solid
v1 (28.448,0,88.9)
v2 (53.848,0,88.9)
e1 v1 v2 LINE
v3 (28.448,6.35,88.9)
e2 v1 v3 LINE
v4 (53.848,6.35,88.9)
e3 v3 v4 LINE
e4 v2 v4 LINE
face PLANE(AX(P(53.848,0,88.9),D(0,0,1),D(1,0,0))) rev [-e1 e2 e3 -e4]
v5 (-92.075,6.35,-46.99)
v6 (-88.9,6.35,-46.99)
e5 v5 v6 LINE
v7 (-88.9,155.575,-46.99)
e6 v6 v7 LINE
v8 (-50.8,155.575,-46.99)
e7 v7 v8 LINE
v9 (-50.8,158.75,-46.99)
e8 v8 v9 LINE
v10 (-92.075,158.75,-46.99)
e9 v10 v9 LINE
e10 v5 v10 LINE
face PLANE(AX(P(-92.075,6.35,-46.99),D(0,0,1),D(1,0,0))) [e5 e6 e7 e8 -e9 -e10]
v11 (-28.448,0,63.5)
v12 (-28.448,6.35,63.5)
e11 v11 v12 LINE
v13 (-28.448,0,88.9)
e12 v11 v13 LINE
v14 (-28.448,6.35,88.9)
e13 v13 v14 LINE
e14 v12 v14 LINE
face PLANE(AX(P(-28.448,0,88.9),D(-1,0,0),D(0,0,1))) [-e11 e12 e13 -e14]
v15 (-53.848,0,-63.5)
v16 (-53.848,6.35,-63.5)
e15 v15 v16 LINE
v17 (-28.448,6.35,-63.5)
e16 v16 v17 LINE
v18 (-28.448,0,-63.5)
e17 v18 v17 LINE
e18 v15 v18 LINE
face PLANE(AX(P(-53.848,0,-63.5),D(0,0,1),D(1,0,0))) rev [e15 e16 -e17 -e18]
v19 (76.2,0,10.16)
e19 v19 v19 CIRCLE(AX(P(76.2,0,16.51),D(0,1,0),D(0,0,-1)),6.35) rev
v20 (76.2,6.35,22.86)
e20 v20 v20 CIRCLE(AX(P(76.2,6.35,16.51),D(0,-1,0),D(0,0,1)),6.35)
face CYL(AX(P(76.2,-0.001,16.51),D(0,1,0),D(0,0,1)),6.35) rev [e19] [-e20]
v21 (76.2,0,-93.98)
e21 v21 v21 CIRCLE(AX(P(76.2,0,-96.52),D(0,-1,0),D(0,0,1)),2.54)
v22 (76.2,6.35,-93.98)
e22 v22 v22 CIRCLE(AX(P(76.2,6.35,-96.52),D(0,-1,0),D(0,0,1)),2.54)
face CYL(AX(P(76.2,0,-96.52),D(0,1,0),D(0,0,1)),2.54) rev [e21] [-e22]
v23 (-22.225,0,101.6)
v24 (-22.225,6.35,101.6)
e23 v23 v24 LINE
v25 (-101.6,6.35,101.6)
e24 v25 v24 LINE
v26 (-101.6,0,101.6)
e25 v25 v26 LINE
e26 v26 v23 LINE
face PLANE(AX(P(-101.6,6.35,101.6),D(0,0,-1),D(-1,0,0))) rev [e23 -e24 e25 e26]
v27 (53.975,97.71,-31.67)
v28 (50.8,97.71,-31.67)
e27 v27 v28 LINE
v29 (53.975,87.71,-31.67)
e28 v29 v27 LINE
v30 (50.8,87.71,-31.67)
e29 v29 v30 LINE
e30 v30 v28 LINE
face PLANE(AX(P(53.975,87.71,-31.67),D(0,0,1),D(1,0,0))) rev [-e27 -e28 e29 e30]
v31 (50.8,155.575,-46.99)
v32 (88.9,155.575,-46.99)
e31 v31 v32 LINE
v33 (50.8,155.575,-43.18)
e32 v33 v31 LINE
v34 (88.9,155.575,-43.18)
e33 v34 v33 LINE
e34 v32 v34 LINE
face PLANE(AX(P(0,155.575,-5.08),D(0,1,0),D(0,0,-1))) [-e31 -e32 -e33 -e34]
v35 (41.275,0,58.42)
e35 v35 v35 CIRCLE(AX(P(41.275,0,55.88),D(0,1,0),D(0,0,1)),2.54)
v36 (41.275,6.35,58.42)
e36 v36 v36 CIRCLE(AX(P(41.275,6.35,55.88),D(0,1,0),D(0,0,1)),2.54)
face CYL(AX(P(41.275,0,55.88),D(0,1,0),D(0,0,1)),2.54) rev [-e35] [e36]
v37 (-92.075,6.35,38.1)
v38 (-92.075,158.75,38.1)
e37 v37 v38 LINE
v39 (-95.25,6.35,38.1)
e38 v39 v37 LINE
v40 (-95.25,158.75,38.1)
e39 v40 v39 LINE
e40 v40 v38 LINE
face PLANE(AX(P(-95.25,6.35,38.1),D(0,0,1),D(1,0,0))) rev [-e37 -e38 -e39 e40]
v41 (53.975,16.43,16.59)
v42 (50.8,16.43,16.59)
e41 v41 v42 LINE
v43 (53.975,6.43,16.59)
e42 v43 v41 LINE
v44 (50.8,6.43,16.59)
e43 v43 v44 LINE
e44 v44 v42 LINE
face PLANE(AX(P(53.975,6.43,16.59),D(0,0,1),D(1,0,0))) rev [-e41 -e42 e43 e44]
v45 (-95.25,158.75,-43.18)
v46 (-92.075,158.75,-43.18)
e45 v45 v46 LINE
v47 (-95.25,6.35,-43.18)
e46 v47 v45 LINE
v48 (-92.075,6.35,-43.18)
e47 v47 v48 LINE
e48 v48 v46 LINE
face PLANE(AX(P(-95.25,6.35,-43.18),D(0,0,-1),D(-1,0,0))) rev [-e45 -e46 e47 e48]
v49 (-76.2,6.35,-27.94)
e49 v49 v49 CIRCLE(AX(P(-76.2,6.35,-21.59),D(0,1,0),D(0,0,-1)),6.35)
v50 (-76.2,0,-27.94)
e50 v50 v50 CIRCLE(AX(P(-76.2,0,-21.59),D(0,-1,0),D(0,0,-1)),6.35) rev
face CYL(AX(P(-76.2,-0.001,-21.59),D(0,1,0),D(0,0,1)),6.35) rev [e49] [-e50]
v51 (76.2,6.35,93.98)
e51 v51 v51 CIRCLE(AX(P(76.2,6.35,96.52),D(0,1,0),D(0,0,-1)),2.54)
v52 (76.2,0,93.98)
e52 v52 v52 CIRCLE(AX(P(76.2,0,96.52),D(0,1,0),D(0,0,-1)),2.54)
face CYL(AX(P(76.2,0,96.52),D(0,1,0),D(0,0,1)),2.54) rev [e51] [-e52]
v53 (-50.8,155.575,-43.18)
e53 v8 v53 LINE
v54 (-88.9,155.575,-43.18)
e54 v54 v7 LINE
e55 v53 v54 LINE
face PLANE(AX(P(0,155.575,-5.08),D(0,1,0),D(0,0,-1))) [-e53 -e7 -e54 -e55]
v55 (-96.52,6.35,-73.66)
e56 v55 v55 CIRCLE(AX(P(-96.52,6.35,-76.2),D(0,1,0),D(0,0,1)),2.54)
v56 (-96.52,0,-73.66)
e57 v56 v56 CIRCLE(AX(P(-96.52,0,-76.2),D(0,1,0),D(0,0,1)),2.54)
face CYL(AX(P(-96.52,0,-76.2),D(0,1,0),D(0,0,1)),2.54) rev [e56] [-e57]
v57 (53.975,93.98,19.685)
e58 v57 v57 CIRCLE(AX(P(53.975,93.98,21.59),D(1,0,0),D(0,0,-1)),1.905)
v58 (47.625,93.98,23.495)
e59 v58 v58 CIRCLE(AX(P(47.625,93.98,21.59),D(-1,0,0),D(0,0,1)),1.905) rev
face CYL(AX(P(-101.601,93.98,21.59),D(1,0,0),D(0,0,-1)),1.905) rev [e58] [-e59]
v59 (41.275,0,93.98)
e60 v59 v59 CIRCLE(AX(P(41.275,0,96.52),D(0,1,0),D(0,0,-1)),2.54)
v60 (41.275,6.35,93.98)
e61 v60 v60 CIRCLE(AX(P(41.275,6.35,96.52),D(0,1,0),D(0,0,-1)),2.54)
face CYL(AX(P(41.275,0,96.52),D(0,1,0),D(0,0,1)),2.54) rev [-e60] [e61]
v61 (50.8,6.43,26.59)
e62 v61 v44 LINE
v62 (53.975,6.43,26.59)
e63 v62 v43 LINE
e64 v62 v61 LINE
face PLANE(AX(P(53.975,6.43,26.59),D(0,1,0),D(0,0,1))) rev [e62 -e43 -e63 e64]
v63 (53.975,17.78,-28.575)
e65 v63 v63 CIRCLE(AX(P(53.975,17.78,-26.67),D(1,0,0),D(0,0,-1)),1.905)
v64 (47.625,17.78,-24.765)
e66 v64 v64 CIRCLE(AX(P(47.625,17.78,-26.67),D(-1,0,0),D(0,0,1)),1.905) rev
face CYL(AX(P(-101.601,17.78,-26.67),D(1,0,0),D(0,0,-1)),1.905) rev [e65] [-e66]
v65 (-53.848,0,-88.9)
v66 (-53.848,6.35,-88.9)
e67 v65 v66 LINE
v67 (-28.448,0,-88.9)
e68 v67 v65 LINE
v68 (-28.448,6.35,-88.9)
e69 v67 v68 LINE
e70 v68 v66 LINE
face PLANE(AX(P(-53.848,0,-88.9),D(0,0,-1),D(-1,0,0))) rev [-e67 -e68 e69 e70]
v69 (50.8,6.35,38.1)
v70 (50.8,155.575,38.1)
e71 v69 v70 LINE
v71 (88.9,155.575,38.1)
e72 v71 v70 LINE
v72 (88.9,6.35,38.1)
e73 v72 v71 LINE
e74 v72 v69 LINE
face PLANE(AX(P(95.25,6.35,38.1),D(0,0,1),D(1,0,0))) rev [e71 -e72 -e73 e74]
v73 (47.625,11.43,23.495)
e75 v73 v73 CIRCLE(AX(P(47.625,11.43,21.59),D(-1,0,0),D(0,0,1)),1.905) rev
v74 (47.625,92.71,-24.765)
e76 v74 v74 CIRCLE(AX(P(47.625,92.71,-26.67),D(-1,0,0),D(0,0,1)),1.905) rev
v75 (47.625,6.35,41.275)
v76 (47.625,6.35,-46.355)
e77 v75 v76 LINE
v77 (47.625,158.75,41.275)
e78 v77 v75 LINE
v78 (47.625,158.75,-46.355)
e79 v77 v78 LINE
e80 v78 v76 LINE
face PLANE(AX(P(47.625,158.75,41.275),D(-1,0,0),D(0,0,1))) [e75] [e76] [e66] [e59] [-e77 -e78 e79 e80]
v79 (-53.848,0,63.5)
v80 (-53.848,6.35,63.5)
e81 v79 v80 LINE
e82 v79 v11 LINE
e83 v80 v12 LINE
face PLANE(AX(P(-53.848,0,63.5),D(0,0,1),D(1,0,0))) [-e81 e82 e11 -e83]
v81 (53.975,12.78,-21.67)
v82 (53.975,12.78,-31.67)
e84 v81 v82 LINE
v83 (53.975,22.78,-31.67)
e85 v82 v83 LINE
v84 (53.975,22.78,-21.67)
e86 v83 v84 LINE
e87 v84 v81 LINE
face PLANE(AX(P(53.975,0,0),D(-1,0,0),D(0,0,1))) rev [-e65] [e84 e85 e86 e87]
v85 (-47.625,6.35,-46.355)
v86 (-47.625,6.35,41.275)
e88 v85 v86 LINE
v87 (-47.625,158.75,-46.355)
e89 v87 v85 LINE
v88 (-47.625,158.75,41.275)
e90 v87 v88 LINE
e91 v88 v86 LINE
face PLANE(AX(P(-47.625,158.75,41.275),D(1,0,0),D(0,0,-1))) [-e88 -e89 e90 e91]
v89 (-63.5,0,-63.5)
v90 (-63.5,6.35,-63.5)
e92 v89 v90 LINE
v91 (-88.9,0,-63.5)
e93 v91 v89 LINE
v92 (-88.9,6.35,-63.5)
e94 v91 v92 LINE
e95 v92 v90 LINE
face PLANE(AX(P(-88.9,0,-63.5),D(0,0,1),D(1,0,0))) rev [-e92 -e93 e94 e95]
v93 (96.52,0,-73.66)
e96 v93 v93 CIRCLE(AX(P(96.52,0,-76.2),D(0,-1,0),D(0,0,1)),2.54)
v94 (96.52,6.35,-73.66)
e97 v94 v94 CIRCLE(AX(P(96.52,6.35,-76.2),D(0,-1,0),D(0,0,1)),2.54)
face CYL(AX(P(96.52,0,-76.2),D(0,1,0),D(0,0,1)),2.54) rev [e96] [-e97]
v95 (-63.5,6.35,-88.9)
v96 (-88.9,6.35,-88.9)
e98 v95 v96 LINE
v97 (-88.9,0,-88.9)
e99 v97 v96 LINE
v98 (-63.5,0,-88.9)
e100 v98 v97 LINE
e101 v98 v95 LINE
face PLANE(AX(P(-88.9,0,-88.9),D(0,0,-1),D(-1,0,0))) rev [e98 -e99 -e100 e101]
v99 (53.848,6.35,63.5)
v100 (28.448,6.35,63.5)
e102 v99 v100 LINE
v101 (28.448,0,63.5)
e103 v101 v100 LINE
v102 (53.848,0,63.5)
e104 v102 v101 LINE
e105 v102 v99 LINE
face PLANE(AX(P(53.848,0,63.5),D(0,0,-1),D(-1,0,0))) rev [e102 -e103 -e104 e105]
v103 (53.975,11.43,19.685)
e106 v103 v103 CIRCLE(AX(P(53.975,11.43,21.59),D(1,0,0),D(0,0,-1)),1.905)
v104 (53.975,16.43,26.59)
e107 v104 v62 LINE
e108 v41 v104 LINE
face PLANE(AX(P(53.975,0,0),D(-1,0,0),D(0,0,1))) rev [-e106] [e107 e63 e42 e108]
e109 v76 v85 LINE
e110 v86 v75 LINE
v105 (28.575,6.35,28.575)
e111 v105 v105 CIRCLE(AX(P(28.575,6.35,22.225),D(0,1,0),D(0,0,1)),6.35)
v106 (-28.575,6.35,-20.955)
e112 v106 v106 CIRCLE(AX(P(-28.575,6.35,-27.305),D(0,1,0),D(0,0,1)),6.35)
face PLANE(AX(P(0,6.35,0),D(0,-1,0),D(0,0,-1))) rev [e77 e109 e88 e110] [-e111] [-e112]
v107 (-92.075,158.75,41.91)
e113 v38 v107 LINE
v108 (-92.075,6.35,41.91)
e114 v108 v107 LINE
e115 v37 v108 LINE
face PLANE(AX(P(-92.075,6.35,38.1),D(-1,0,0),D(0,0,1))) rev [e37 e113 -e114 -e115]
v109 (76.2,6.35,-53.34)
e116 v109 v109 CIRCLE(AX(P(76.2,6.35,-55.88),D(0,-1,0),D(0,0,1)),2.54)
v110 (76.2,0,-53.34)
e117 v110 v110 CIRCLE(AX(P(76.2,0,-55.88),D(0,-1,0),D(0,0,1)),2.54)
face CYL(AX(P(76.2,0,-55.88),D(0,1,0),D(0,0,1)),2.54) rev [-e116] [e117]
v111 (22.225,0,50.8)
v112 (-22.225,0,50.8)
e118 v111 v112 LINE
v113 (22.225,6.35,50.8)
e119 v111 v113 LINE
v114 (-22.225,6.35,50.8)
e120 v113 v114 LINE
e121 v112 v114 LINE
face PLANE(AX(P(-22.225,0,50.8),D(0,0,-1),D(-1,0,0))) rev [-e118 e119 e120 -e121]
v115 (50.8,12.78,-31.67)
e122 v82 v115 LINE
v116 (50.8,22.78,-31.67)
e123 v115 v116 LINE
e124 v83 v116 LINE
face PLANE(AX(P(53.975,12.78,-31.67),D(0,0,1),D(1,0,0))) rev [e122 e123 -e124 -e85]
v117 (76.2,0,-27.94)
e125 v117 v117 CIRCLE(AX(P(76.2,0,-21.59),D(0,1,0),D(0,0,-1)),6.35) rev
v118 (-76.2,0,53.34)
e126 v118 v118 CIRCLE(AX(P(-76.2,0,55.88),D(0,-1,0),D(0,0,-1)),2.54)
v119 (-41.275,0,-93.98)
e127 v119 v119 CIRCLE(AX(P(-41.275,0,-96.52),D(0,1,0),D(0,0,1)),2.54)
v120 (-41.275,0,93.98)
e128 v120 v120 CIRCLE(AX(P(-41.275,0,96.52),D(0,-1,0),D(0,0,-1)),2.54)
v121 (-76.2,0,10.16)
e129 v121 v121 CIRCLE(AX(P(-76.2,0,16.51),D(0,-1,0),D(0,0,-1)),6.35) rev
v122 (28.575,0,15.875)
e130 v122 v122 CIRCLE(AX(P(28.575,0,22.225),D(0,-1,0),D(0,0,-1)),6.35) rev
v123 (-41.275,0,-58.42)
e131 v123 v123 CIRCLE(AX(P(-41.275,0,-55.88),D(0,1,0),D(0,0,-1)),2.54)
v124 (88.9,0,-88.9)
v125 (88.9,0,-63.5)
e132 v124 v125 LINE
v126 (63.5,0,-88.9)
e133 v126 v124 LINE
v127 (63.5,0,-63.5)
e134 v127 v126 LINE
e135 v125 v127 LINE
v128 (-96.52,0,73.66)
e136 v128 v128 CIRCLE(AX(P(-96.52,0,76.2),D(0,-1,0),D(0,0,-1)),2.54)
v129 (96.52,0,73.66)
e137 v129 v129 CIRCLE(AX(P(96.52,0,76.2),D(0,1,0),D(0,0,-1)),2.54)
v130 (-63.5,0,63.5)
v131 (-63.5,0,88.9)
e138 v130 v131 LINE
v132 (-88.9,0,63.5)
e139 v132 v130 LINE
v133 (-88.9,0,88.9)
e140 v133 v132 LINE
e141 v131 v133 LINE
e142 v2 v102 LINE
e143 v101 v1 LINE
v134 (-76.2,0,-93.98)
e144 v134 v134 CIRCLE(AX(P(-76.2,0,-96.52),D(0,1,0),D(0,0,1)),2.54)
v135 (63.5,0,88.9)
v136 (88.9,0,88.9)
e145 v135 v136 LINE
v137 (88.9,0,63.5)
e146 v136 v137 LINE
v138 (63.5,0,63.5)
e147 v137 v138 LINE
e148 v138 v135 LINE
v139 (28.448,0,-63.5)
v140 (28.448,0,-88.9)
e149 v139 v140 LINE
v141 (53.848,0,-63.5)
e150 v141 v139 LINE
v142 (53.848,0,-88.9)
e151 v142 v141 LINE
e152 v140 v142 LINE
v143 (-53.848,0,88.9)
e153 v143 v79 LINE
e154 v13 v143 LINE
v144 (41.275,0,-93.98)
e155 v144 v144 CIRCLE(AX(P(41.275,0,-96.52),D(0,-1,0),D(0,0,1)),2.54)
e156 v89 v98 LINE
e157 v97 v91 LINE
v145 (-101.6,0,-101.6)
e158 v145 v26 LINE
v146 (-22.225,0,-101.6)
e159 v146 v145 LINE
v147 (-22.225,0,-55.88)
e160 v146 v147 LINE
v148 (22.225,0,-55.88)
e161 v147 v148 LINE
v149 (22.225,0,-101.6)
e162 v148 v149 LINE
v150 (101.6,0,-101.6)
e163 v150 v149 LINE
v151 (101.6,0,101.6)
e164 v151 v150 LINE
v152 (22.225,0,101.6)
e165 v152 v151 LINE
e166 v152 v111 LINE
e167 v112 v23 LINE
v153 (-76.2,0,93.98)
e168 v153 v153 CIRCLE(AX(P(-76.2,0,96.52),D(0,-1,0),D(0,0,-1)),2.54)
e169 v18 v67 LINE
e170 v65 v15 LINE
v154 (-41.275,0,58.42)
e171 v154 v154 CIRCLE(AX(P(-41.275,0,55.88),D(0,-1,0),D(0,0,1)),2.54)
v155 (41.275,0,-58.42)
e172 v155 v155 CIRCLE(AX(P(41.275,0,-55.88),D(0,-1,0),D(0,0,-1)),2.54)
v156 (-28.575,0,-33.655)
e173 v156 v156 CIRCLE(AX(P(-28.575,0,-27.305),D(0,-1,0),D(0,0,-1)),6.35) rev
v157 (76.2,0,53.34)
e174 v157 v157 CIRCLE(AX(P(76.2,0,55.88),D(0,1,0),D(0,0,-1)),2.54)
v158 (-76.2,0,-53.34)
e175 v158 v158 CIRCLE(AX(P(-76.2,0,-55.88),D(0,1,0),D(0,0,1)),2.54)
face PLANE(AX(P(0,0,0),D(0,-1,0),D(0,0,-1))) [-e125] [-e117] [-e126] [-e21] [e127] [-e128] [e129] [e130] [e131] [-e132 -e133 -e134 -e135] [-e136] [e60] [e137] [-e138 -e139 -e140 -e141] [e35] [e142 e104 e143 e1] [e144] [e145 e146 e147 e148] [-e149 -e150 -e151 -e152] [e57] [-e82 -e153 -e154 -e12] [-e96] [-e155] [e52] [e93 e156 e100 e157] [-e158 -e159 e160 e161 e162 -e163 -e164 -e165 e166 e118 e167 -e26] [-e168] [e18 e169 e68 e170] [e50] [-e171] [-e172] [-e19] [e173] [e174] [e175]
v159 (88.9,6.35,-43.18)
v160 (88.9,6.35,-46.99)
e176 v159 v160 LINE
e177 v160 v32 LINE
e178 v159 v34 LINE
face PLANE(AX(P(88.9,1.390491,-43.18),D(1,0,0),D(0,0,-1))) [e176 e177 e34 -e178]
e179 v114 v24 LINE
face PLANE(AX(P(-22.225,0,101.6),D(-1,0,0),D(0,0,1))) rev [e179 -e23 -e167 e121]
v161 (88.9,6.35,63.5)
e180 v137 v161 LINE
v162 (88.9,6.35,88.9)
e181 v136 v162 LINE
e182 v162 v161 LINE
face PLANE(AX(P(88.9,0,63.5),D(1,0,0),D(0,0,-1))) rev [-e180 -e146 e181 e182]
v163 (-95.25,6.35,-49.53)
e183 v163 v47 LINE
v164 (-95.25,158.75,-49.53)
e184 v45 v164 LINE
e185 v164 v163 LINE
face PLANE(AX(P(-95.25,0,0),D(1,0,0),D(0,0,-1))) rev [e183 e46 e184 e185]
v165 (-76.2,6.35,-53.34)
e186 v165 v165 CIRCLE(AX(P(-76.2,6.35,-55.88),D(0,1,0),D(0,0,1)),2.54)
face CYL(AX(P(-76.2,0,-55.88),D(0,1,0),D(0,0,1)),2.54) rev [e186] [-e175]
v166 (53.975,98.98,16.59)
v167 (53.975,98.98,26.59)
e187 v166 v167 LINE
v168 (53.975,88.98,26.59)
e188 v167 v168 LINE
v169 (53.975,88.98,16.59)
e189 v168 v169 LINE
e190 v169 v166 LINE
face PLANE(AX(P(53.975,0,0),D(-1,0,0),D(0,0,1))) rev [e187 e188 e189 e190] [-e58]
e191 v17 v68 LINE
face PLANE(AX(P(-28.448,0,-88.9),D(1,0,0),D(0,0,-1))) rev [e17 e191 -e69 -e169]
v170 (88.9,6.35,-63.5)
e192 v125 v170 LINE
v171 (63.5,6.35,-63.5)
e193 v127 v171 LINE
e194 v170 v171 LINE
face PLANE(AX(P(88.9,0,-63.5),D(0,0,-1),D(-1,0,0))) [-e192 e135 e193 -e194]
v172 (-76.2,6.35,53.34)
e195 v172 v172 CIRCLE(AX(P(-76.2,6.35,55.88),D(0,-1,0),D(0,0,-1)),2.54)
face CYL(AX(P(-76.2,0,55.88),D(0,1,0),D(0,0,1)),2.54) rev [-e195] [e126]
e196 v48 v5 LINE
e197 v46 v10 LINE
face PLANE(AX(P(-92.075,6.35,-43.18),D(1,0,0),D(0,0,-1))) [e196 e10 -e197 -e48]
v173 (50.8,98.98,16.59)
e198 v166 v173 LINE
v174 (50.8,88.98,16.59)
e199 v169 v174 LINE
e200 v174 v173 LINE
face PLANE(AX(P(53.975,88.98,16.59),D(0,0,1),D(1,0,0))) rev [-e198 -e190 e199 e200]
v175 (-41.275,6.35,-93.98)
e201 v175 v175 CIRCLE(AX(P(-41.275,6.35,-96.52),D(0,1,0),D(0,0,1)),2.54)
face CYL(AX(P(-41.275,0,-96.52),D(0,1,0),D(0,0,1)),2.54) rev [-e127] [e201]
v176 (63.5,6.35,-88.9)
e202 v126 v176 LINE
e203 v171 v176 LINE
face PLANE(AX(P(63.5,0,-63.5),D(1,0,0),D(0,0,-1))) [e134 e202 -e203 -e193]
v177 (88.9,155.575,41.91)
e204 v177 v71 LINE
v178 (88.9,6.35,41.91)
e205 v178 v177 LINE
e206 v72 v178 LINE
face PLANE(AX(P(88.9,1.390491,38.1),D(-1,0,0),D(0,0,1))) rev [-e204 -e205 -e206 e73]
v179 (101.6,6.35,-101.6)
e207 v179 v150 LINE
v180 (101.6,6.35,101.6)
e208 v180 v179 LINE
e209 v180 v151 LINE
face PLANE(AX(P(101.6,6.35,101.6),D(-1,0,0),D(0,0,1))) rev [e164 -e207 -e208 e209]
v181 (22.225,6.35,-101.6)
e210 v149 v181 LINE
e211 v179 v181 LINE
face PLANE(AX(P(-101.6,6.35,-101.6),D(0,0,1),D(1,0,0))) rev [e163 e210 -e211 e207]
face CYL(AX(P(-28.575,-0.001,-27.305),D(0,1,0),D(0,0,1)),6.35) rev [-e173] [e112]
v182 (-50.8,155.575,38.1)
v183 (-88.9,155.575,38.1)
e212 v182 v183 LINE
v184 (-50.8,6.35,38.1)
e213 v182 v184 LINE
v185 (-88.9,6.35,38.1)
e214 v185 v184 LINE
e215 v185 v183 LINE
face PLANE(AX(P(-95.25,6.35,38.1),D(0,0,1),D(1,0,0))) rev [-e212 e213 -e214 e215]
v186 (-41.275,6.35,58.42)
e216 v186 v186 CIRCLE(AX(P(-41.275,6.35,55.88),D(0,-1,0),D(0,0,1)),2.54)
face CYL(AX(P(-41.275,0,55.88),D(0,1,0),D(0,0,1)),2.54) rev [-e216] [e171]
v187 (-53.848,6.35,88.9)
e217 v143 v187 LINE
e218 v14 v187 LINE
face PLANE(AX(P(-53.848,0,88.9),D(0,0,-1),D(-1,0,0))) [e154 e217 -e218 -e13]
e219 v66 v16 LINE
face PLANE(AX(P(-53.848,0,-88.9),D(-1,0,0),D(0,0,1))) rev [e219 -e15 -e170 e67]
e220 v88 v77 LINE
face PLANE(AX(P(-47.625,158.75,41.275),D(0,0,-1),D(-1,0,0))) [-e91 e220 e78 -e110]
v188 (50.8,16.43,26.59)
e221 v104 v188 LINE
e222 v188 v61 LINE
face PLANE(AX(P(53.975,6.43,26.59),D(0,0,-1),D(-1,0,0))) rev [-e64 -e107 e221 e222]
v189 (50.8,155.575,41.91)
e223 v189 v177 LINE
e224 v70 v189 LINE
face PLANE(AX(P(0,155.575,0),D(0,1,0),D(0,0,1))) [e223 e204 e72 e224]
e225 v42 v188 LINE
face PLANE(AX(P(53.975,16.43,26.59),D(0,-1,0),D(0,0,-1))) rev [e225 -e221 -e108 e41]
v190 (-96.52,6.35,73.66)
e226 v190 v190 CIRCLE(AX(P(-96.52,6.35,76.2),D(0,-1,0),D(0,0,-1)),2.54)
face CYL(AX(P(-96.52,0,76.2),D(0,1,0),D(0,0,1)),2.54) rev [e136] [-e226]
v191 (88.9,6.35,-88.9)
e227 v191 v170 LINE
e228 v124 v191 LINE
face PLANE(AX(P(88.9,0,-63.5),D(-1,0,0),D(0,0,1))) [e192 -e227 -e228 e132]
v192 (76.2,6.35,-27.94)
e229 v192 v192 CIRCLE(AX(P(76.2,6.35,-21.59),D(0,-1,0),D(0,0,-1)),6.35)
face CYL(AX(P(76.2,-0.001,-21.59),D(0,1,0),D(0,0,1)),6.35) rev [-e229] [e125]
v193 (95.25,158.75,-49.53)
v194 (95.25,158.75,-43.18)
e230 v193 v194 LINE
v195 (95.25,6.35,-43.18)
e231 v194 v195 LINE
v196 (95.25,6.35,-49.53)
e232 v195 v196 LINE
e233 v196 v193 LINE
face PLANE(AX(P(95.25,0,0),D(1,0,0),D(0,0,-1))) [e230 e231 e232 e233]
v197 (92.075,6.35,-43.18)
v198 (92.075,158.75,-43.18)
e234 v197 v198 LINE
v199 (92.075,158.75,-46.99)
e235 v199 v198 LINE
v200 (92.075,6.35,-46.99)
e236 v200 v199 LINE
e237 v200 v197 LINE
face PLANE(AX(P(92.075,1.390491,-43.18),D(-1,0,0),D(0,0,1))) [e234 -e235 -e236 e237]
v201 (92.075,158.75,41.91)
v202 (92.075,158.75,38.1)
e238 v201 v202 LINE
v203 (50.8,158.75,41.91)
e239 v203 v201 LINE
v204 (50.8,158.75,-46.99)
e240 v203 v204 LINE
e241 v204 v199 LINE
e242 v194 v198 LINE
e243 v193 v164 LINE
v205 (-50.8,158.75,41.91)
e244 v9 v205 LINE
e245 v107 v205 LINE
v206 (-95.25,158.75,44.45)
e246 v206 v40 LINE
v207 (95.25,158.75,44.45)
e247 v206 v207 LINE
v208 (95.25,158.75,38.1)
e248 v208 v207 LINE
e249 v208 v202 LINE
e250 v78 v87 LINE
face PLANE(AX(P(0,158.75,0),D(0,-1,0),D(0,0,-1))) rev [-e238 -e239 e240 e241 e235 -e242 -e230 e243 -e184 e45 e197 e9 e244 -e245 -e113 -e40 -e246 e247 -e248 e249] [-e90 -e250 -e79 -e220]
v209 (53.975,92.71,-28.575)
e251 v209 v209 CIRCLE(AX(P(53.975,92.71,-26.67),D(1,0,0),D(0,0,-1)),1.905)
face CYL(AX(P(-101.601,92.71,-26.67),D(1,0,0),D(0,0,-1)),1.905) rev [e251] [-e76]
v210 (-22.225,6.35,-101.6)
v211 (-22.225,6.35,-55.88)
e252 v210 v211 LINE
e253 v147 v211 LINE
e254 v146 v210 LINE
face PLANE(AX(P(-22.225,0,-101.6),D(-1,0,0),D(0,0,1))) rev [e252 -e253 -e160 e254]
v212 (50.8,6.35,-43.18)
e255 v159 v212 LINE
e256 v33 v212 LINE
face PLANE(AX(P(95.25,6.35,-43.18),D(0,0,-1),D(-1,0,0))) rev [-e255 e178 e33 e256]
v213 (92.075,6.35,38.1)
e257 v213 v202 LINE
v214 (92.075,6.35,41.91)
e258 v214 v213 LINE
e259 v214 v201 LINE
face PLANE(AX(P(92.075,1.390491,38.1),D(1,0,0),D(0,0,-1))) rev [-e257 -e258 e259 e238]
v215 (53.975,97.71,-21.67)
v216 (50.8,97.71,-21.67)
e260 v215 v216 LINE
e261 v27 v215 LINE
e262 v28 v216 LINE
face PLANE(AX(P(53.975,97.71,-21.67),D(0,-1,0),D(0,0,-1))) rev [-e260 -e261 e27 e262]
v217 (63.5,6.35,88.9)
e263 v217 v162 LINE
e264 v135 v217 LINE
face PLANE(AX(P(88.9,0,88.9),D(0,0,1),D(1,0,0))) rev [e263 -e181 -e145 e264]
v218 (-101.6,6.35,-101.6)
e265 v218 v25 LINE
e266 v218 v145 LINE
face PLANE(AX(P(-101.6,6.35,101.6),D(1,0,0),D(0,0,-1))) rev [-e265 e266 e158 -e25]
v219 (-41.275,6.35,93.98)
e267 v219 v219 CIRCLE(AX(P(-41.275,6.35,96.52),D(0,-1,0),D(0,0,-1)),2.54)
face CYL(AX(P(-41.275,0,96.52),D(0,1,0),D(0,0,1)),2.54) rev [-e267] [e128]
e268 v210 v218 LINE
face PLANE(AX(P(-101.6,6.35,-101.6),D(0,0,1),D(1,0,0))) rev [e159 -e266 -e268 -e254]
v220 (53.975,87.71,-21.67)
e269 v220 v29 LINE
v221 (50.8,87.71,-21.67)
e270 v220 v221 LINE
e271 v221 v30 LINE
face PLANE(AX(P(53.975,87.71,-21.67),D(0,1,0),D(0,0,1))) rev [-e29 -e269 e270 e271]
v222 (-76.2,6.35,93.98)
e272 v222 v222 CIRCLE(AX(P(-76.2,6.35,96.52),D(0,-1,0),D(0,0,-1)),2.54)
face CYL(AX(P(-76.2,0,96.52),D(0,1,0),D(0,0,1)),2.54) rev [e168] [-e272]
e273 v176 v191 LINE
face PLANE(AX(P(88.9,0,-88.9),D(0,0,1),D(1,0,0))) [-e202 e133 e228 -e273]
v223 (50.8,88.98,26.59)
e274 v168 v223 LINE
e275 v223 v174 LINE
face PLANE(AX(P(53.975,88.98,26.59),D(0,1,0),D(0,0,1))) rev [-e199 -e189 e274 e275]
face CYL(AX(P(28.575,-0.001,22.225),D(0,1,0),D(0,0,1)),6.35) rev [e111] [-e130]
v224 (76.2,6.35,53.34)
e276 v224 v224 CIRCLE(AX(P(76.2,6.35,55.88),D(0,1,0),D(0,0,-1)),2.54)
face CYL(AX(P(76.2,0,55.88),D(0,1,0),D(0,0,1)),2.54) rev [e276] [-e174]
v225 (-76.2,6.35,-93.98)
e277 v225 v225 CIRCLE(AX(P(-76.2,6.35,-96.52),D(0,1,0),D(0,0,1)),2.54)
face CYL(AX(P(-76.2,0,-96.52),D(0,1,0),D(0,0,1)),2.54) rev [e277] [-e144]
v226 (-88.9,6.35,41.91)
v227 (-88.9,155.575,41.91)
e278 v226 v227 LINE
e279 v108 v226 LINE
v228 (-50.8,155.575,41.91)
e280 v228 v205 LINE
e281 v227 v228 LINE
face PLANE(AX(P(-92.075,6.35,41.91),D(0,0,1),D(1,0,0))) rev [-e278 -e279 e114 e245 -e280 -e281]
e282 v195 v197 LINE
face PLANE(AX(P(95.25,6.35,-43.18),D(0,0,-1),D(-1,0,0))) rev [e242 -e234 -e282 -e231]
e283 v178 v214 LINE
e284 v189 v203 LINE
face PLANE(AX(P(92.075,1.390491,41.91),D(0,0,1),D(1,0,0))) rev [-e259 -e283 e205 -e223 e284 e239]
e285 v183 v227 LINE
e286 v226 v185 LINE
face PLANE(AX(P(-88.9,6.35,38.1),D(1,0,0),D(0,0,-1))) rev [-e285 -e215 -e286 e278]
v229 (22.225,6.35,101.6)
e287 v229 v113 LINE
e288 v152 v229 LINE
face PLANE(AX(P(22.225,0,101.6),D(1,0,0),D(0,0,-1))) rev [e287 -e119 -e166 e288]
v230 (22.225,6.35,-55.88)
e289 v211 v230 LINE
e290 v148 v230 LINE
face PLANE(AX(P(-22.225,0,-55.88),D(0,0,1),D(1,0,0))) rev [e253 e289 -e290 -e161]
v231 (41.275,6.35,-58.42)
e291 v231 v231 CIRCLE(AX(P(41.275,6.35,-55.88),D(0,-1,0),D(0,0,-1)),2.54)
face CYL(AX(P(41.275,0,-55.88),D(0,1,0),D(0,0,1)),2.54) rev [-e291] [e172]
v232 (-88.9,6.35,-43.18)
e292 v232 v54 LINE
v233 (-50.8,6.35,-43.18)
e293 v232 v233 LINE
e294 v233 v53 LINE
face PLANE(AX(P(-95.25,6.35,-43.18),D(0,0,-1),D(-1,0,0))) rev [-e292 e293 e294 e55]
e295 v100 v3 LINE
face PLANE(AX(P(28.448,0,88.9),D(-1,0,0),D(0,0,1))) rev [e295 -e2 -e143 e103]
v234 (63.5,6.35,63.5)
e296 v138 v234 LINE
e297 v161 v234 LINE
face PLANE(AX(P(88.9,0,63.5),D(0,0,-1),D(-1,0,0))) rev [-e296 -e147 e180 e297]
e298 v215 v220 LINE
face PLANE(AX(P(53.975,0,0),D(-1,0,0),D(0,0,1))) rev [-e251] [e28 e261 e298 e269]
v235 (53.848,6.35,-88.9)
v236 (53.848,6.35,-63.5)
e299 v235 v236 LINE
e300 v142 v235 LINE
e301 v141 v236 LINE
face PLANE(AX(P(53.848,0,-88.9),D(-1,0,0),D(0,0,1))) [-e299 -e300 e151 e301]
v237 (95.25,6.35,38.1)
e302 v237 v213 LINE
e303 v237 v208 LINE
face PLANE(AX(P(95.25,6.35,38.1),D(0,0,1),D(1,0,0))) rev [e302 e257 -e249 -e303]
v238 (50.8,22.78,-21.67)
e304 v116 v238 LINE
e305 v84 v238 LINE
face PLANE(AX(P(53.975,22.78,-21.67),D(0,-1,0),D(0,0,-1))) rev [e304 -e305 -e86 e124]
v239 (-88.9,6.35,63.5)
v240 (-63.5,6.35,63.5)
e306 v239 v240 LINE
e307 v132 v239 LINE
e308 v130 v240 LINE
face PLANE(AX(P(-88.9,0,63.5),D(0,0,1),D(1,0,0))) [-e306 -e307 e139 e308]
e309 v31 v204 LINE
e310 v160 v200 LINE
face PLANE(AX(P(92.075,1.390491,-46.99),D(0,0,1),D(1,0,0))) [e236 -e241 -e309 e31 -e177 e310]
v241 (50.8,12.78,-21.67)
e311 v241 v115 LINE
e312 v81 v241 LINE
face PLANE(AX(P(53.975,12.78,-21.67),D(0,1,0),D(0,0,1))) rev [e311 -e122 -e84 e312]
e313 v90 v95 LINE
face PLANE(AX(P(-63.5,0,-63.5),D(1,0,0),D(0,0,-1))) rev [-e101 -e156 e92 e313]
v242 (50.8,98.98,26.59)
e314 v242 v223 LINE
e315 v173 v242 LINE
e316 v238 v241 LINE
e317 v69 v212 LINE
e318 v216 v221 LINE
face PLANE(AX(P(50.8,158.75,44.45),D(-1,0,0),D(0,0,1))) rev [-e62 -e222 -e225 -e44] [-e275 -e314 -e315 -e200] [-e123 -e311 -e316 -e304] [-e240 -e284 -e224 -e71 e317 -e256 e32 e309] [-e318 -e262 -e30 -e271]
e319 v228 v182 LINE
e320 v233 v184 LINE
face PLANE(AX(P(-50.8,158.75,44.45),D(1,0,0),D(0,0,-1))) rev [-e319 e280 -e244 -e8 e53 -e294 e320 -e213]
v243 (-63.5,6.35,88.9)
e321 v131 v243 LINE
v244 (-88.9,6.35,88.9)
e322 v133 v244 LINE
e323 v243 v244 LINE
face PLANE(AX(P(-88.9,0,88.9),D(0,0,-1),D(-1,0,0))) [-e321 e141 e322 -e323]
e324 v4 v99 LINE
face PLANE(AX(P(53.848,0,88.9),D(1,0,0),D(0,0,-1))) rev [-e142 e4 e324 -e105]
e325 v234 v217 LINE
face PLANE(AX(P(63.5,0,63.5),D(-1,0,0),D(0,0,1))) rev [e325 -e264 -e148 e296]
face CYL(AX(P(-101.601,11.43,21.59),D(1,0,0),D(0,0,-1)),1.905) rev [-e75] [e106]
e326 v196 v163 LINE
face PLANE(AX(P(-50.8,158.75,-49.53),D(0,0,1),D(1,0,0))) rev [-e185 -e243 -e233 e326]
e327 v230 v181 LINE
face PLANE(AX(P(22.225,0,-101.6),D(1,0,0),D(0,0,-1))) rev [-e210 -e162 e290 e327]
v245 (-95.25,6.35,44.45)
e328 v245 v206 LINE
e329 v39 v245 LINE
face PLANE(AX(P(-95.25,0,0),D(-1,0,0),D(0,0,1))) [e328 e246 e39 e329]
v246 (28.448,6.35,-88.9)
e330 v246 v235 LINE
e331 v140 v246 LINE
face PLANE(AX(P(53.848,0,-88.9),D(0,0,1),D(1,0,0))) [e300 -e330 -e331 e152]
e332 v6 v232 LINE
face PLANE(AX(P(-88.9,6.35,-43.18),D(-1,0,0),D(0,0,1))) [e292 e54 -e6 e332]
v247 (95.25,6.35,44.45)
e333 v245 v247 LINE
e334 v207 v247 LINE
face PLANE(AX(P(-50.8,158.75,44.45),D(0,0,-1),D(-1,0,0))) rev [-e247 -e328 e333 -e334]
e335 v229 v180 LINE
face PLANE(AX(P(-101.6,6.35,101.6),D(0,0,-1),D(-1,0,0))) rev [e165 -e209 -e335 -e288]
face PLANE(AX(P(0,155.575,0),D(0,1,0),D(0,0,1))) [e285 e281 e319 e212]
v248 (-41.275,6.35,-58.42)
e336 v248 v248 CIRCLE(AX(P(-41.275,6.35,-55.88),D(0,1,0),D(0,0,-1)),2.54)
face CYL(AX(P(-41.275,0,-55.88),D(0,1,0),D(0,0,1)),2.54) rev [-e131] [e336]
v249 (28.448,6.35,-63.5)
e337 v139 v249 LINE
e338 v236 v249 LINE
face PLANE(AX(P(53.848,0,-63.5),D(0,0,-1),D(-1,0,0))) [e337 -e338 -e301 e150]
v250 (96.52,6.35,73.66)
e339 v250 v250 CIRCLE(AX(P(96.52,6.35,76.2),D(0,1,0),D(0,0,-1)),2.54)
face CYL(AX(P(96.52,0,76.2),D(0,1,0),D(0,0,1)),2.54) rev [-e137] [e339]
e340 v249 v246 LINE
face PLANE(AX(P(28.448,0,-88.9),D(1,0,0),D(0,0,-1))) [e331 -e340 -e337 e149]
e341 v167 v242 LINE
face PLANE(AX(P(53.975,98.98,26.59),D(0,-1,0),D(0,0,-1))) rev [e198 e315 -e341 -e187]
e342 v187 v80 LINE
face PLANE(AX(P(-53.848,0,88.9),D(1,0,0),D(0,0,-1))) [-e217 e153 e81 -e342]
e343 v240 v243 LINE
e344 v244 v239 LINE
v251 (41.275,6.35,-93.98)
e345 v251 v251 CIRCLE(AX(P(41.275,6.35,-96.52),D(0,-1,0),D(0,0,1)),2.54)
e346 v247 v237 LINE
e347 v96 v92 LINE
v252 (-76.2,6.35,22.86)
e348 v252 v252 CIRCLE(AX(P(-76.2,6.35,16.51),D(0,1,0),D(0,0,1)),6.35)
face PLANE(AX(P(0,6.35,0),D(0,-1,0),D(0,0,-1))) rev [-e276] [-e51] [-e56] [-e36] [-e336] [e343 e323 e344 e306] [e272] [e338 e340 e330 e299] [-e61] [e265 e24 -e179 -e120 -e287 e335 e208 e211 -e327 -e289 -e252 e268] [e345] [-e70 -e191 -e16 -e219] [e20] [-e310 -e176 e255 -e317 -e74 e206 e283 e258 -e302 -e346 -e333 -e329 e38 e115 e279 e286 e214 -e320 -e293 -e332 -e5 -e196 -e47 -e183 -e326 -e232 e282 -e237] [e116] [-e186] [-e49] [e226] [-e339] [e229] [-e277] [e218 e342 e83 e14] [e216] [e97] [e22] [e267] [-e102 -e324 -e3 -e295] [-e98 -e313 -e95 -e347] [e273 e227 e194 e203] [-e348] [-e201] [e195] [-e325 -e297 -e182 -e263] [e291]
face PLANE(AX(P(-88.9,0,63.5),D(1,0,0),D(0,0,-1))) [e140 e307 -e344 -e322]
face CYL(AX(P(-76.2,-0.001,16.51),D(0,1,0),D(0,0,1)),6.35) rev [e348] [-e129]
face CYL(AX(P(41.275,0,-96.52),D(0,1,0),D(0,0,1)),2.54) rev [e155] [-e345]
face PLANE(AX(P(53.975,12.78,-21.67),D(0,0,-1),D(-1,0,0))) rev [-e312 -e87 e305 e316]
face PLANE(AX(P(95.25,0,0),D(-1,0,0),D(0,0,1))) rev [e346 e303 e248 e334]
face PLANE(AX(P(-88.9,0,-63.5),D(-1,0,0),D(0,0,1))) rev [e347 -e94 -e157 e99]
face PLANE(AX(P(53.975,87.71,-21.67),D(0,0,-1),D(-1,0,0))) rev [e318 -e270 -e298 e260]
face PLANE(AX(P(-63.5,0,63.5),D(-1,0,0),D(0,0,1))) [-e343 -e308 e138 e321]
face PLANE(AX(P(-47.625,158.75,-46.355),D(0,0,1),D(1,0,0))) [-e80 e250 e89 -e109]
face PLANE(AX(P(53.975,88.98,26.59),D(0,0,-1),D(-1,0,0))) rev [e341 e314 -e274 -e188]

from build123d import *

# Parameters (mm, degrees)
SKETCH1_W               = 203.2
SKETCH1_H               = 203.2
BOSS_EXTRUDE1_DEPTH     = 6.35
SKETCH2_W               = 44.45
SKETCH2_H               = 45.72
SKETCH2_H_2             = 50.8
CUT_EXTRUDE1_DEPTH      = 144.824345992
SKETCH3_R               = 2.54
SKETCH3_W               = 25.4
SKETCH3_H               = 25.4
CUT_EXTRUDE2_DEPTH      = 6.35
MIRROR2_COPY_1_SKETCH_R = 2.54
MIRROR2_COPY_1_SKETCH_W = 25.4
MIRROR2_COPY_1_SKETCH_H = 25.4
MIRROR2_COPY_1_DEPTH    = 6.35
SKETCH4_W               = 101.6
SKETCH4_H               = 93.98
SKETCH4_W_2             = 95.25
SKETCH4_H_2             = 87.63
BOSS_EXTRUDE2_DEPTH     = 152.4
SKETCH5_W               = 10
SKETCH5_H               = 10
SKETCH5_R               = 1.6
BOSS_EXTRUDE3_DEPTH     = 3.175
CUT_EXTRUDE3_REACH      = 246.393
SKETCH8_R               = 1.905
SKETCH9_W               = 6.35
SKETCH9_H               = 152.4
BOSS_EXTRUDE4_DEPTH     = 44.45
SKETCH12_W              = 3.175
SKETCH12_H              = 3.81
CUT_EXTRUDE4_DEPTH      = 152.4
SKETCH13_W              = 38.1
SKETCH13_H              = 3.81
CUT_EXTRUDE5_DEPTH      = 3.175
SKETCH14_W              = 6.35
SKETCH14_H              = 152.4
BOSS_EXTRUDE5_DEPTH     = 44.45
SKETCH15_W              = 3.175
SKETCH15_H              = 3.81
CUT_EXTRUDE6_DEPTH      = 152.4
SKETCH16_W              = 38.1
SKETCH16_H              = 3.81
CUT_EXTRUDE7_DEPTH      = 3.175
CUT_EXTRUDE8_REACH      = 211.454
SKETCH17_R              = 6.35
MIRROR5_OUTLINE_R       = 6.35
MIRROR5_DEPTH           = 6.35


# Read off the part's stored shape, not the designer's step: Mirror5
with BuildPart() as part:
    # Sketch1 → Boss-Extrude1 (new body)
    with BuildSketch(Plane(origin=(0, 0, 0), x_dir=(1, 0, 0), z_dir=(0, 1, 0))):
        Rectangle(SKETCH1_W, SKETCH1_H)
    extrude(amount=BOSS_EXTRUDE1_DEPTH)

    # Sketch2 → Cut-Extrude1 (cut, through all)
    with BuildSketch(Plane(origin=(0, 6.35, 0), x_dir=(1, 0, 0), z_dir=(0, 1, 0))):
        with Locations((0, 78.74)):
            Rectangle(SKETCH2_W, SKETCH2_H)
        with Locations((0, -76.2)):
            Rectangle(SKETCH2_W, SKETCH2_H_2)
    extrude(amount=-CUT_EXTRUDE1_DEPTH, mode=Mode.SUBTRACT)

    # Sketch3 → Cut-Extrude2 (cut)
    with BuildSketch(Plane(origin=(0, 6.35, 0), x_dir=(1, 0, 0), z_dir=(0, 1, 0))):
        with Locations(Location((-96.52, 76.2, 0), (0, 0, 270))):
            Circle(SKETCH3_R)
        with Locations(Location((-76.2, 96.52, 0), (0, 0, 270))):
            Circle(SKETCH3_R)
        with Locations(Location((-76.2, 55.88, 0), (0, 0, 270))):
            Circle(SKETCH3_R)
        with Locations(Location((-41.275, 96.52, 0), (0, 0, 270))):
            Circle(SKETCH3_R)
        with Locations(Location((-41.275, 55.88, 0), (0, 0, 90))):
            Circle(SKETCH3_R)
        with Locations((-41.148, 76.2)):
            Rectangle(SKETCH3_W, SKETCH3_H)
        with Locations((-76.2, 76.2)):
            Rectangle(SKETCH3_W, SKETCH3_H)
    cut_extrude2 = extrude(amount=-CUT_EXTRUDE2_DEPTH, mode=Mode.SUBTRACT)

    # Mirror1: Cut-Extrude2 across plane
    add(cut_extrude2.mirror(Plane(origin=(0, 0, 0), x_dir=(0, 0, 1), z_dir=(1, 0, 0))), mode=Mode.SUBTRACT)

    # Mirror2: Cut-Extrude2 across plane
    add(cut_extrude2.mirror(Plane.XY), mode=Mode.SUBTRACT)

    # Mirror2 copy 1 sketch → Mirror2 copy 1 (cut)
    with BuildSketch(Plane(origin=(0, 6.35, 0), x_dir=(-1, 0, 0), z_dir=(0, 1, 0))):
        with Locations(Location((-96.52, 76.2, 0), (0, 0, 270))):
            Circle(MIRROR2_COPY_1_SKETCH_R)
        with Locations(Location((-76.2, 96.52, 0), (0, 0, 270))):
            Circle(MIRROR2_COPY_1_SKETCH_R)
        with Locations(Location((-76.2, 55.88, 0), (0, 0, 270))):
            Circle(MIRROR2_COPY_1_SKETCH_R)
        with Locations(Location((-41.275, 96.52, 0), (0, 0, 270))):
            Circle(MIRROR2_COPY_1_SKETCH_R)
        with Locations(Location((-41.275, 55.88, 0), (0, 0, 90))):
            Circle(MIRROR2_COPY_1_SKETCH_R)
        with Locations((-41.148, 76.2)):
            Rectangle(MIRROR2_COPY_1_SKETCH_W, MIRROR2_COPY_1_SKETCH_H)
        with Locations((-76.2, 76.2)):
            Rectangle(MIRROR2_COPY_1_SKETCH_W, MIRROR2_COPY_1_SKETCH_H)
    extrude(amount=-MIRROR2_COPY_1_DEPTH, mode=Mode.SUBTRACT)

    # Sketch4 → Boss-Extrude2 (add)
    with BuildSketch(Plane(origin=(0, 6.35, 0), x_dir=(1, 0, 0), z_dir=(0, 1, 0))):
        with Locations((0, 2.54)):
            Rectangle(SKETCH4_W, SKETCH4_H)
        with Locations((0, 2.54)):
            Rectangle(SKETCH4_W_2, SKETCH4_H_2, mode=Mode.SUBTRACT)
    extrude(amount=BOSS_EXTRUDE2_DEPTH)

    # Sketch5 → Boss-Extrude3 (add)
    # profile 1 of 4: a face of its own
    with BuildSketch(Plane(origin=(50.8, 0, 0), x_dir=(0, 0, -1), z_dir=(1, 0, 0))):
        with Locations((-21.59, 93.98)):
            Rectangle(SKETCH5_W, SKETCH5_H)
        with Locations((-21.59, 93.98)):
            Circle(SKETCH5_R, mode=Mode.SUBTRACT)
    # profile 2 of 4: a face of its own
    with BuildSketch(Plane(origin=(50.8, 0, 0), x_dir=(0, 0, -1), z_dir=(1, 0, 0))):
        with Locations((26.67, 92.71)):
            Rectangle(SKETCH5_W, SKETCH5_H)
        with Locations((26.67, 92.71)):
            Circle(SKETCH5_R, mode=Mode.SUBTRACT)
    # profile 3 of 4: a face of its own
    with BuildSketch(Plane(origin=(50.8, 0, 0), x_dir=(0, 0, -1), z_dir=(1, 0, 0))):
        with Locations((-21.59, 11.43)):
            Rectangle(SKETCH5_W, SKETCH5_H)
        with Locations((-21.59, 11.43)):
            Circle(SKETCH5_R, mode=Mode.SUBTRACT)
    # profile 4 of 4: a face of its own
    with BuildSketch(Plane(origin=(50.8, 0, 0), x_dir=(0, 0, -1), z_dir=(1, 0, 0))):
        with Locations((26.67, 17.78)):
            Rectangle(SKETCH5_W, SKETCH5_H)
        with Locations((26.67, 17.78)):
            Circle(SKETCH5_R, mode=Mode.SUBTRACT)
    extrude(amount=BOSS_EXTRUDE3_DEPTH)

    # Sketch8 → Cut-Extrude3 (cut, up to next)
    with BuildSketch(Plane(origin=(53.975, 0, 0), x_dir=(0, 0, -1), z_dir=(1, 0, 0)), mode=Mode.PRIVATE) as cut_extrude3_sk1:
        with Locations((-21.59, 93.98)):
            Circle(SKETCH8_R)
    cut_extrude3_tool1 = extrude(cut_extrude3_sk1.sketch, amount=-CUT_EXTRUDE3_REACH, mode=Mode.PRIVATE) & part.part
    # Sketch8 → Cut-Extrude3 (cut, up to next)
    with BuildSketch(Plane(origin=(53.975, 0, 0), x_dir=(0, 0, -1), z_dir=(1, 0, 0)), mode=Mode.PRIVATE) as cut_extrude3_sk2:
        with Locations((26.67, 92.71)):
            Circle(SKETCH8_R)
    cut_extrude3_tool2 = extrude(cut_extrude3_sk2.sketch, amount=-CUT_EXTRUDE3_REACH, mode=Mode.PRIVATE) & part.part
    # Sketch8 → Cut-Extrude3 (cut, up to next)
    with BuildSketch(Plane(origin=(53.975, 0, 0), x_dir=(0, 0, -1), z_dir=(1, 0, 0)), mode=Mode.PRIVATE) as cut_extrude3_sk3:
        with Locations((-21.59, 11.43)):
            Circle(SKETCH8_R)
    cut_extrude3_tool3 = extrude(cut_extrude3_sk3.sketch, amount=-CUT_EXTRUDE3_REACH, mode=Mode.PRIVATE) & part.part
    # Sketch8 → Cut-Extrude3 (cut, up to next)
    with BuildSketch(Plane(origin=(53.975, 0, 0), x_dir=(0, 0, -1), z_dir=(1, 0, 0)), mode=Mode.PRIVATE) as cut_extrude3_sk4:
        with Locations((26.67, 17.78)):
            Circle(SKETCH8_R)
    cut_extrude3_tool4 = extrude(cut_extrude3_sk4.sketch, amount=-CUT_EXTRUDE3_REACH, mode=Mode.PRIVATE) & part.part
    add(cut_extrude3_tool1.solids().sort_by_distance((53.975, 93.98, 21.59))[0], mode=Mode.SUBTRACT)
    add(cut_extrude3_tool2.solids().sort_by_distance((53.975, 92.71, -26.67))[0], mode=Mode.SUBTRACT)
    add(cut_extrude3_tool3.solids().sort_by_distance((53.975, 11.43, 21.59))[0], mode=Mode.SUBTRACT)
    add(cut_extrude3_tool4.solids().sort_by_distance((53.975, 17.78, -26.67))[0], mode=Mode.SUBTRACT)

    # Sketch9 → Boss-Extrude4 (add)
    with BuildSketch(Plane(origin=(50.8, 0, 0), x_dir=(0, 0, -1), z_dir=(1, 0, 0))):
        with Locations((-41.275, 82.55)):
            Rectangle(SKETCH9_W, SKETCH9_H)
        with Locations((46.355, 82.55)):
            Rectangle(SKETCH9_W, SKETCH9_H)
    extrude(amount=BOSS_EXTRUDE4_DEPTH)

    # Sketch12 → Cut-Extrude4 (cut)
    with BuildSketch(Plane(origin=(0, 158.75, 0), x_dir=(1, 0, 0), z_dir=(0, 1, 0))):
        with Locations((90.4875, -40.005)):
            Rectangle(SKETCH12_W, SKETCH12_H)
    cut_extrude4 = extrude(amount=-CUT_EXTRUDE4_DEPTH, mode=Mode.SUBTRACT)

    # Sketch13 → Cut-Extrude5 (cut)
    with BuildSketch(Plane(origin=(0, 158.75, 0), x_dir=(1, 0, 0), z_dir=(0, 1, 0))):
        with Locations((69.85, -40.005)):
            Rectangle(SKETCH13_W, SKETCH13_H)
    cut_extrude5 = extrude(amount=-CUT_EXTRUDE5_DEPTH, mode=Mode.SUBTRACT)

    # Mirror3: Cut-Extrude4, Cut-Extrude5 across plane
    add(cut_extrude4.mirror(Plane(origin=(0, 0, -2.54), x_dir=(1, 0, 0), z_dir=(0, 0, -1))), mode=Mode.SUBTRACT)
    add(cut_extrude5.mirror(Plane(origin=(0, 0, -2.54), x_dir=(1, 0, 0), z_dir=(0, 0, -1))), mode=Mode.SUBTRACT)

    # Sketch14 → Boss-Extrude5 (add)
    with BuildSketch(Plane.ZY.offset(50.8)):
        with Locations((-46.355, 82.55)):
            Rectangle(SKETCH14_W, SKETCH14_H)
        with Locations((41.275, 82.55)):
            Rectangle(SKETCH14_W, SKETCH14_H)
    extrude(amount=BOSS_EXTRUDE5_DEPTH)

    # Sketch15 → Cut-Extrude6 (cut)
    with BuildSketch(Plane(origin=(0, 158.75, 0), x_dir=(1, 0, 0), z_dir=(0, 1, 0))):
        with Locations((-90.4875, -40.005)):
            Rectangle(SKETCH15_W, SKETCH15_H)
    cut_extrude6 = extrude(amount=-CUT_EXTRUDE6_DEPTH, mode=Mode.SUBTRACT)

    # Sketch16 → Cut-Extrude7 (cut)
    with BuildSketch(Plane(origin=(0, 158.75, 0), x_dir=(1, 0, 0), z_dir=(0, 1, 0))):
        with Locations((-69.85, -40.005)):
            Rectangle(SKETCH16_W, SKETCH16_H)
    cut_extrude7 = extrude(amount=-CUT_EXTRUDE7_DEPTH, mode=Mode.SUBTRACT)

    # Mirror4: Cut-Extrude6, Cut-Extrude7 across plane
    add(cut_extrude6.mirror(Plane(origin=(0, 0, -2.54), x_dir=(1, 0, 0), z_dir=(0, 0, -1))), mode=Mode.SUBTRACT)
    add(cut_extrude7.mirror(Plane(origin=(0, 0, -2.54), x_dir=(1, 0, 0), z_dir=(0, 0, -1))), mode=Mode.SUBTRACT)

    # Sketch17 → Cut-Extrude8 (cut, up to next)
    with BuildSketch(Plane(origin=(0, 6.35, 0), x_dir=(1, 0, 0), z_dir=(0, 1, 0)), mode=Mode.PRIVATE) as cut_extrude8_sk1:
        with Locations(Location((-76.2, -16.51, 0), (0, 0, 270))):
            Circle(SKETCH17_R)
    cut_extrude8_tool1 = extrude(cut_extrude8_sk1.sketch, amount=-CUT_EXTRUDE8_REACH, mode=Mode.PRIVATE) & part.part
    # Sketch17 → Cut-Extrude8 (cut, up to next)
    with BuildSketch(Plane(origin=(0, 6.35, 0), x_dir=(1, 0, 0), z_dir=(0, 1, 0)), mode=Mode.PRIVATE) as cut_extrude8_sk2:
        with Locations(Location((-76.2, 21.59, 0), (0, 0, 90))):
            Circle(SKETCH17_R)
    cut_extrude8_tool2 = extrude(cut_extrude8_sk2.sketch, amount=-CUT_EXTRUDE8_REACH, mode=Mode.PRIVATE) & part.part
    # Sketch17 → Cut-Extrude8 (cut, up to next)
    with BuildSketch(Plane(origin=(0, 6.35, 0), x_dir=(1, 0, 0), z_dir=(0, 1, 0)), mode=Mode.PRIVATE) as cut_extrude8_sk3:
        with Locations(Location((-28.575, 27.305, 0), (0, 0, 270))):
            Circle(SKETCH17_R)
    cut_extrude8_tool3 = extrude(cut_extrude8_sk3.sketch, amount=-CUT_EXTRUDE8_REACH, mode=Mode.PRIVATE) & part.part
    # Sketch17 → Cut-Extrude8 (cut, up to next)
    with BuildSketch(Plane(origin=(0, 6.35, 0), x_dir=(1, 0, 0), z_dir=(0, 1, 0)), mode=Mode.PRIVATE) as cut_extrude8_sk4:
        with Locations(Location((28.575, -22.225, 0), (0, 0, 270))):
            Circle(SKETCH17_R)
    cut_extrude8_tool4 = extrude(cut_extrude8_sk4.sketch, amount=-CUT_EXTRUDE8_REACH, mode=Mode.PRIVATE) & part.part
    add(cut_extrude8_tool1.solids().sort_by_distance((-76.2, 6.35, 16.51))[0], mode=Mode.SUBTRACT)
    add(cut_extrude8_tool2.solids().sort_by_distance((-76.2, 6.35, -21.59))[0], mode=Mode.SUBTRACT)
    add(cut_extrude8_tool3.solids().sort_by_distance((-28.575, 6.35, -27.305))[0], mode=Mode.SUBTRACT)
    add(cut_extrude8_tool4.solids().sort_by_distance((28.575, 6.35, 22.225))[0], mode=Mode.SUBTRACT)

    # Mirror5 outline → Mirror5 (cut)
    with BuildSketch(Plane(origin=(0, 0, 0), x_dir=(1, 0, 0), z_dir=(0, 1, 0))):
        with Locations((76.2, 21.59)):
            Circle(MIRROR5_OUTLINE_R)
        with Locations((76.2, -16.51)):
            Circle(MIRROR5_OUTLINE_R)
    extrude(amount=MIRROR5_DEPTH, mode=Mode.SUBTRACT)


solid = part.part
